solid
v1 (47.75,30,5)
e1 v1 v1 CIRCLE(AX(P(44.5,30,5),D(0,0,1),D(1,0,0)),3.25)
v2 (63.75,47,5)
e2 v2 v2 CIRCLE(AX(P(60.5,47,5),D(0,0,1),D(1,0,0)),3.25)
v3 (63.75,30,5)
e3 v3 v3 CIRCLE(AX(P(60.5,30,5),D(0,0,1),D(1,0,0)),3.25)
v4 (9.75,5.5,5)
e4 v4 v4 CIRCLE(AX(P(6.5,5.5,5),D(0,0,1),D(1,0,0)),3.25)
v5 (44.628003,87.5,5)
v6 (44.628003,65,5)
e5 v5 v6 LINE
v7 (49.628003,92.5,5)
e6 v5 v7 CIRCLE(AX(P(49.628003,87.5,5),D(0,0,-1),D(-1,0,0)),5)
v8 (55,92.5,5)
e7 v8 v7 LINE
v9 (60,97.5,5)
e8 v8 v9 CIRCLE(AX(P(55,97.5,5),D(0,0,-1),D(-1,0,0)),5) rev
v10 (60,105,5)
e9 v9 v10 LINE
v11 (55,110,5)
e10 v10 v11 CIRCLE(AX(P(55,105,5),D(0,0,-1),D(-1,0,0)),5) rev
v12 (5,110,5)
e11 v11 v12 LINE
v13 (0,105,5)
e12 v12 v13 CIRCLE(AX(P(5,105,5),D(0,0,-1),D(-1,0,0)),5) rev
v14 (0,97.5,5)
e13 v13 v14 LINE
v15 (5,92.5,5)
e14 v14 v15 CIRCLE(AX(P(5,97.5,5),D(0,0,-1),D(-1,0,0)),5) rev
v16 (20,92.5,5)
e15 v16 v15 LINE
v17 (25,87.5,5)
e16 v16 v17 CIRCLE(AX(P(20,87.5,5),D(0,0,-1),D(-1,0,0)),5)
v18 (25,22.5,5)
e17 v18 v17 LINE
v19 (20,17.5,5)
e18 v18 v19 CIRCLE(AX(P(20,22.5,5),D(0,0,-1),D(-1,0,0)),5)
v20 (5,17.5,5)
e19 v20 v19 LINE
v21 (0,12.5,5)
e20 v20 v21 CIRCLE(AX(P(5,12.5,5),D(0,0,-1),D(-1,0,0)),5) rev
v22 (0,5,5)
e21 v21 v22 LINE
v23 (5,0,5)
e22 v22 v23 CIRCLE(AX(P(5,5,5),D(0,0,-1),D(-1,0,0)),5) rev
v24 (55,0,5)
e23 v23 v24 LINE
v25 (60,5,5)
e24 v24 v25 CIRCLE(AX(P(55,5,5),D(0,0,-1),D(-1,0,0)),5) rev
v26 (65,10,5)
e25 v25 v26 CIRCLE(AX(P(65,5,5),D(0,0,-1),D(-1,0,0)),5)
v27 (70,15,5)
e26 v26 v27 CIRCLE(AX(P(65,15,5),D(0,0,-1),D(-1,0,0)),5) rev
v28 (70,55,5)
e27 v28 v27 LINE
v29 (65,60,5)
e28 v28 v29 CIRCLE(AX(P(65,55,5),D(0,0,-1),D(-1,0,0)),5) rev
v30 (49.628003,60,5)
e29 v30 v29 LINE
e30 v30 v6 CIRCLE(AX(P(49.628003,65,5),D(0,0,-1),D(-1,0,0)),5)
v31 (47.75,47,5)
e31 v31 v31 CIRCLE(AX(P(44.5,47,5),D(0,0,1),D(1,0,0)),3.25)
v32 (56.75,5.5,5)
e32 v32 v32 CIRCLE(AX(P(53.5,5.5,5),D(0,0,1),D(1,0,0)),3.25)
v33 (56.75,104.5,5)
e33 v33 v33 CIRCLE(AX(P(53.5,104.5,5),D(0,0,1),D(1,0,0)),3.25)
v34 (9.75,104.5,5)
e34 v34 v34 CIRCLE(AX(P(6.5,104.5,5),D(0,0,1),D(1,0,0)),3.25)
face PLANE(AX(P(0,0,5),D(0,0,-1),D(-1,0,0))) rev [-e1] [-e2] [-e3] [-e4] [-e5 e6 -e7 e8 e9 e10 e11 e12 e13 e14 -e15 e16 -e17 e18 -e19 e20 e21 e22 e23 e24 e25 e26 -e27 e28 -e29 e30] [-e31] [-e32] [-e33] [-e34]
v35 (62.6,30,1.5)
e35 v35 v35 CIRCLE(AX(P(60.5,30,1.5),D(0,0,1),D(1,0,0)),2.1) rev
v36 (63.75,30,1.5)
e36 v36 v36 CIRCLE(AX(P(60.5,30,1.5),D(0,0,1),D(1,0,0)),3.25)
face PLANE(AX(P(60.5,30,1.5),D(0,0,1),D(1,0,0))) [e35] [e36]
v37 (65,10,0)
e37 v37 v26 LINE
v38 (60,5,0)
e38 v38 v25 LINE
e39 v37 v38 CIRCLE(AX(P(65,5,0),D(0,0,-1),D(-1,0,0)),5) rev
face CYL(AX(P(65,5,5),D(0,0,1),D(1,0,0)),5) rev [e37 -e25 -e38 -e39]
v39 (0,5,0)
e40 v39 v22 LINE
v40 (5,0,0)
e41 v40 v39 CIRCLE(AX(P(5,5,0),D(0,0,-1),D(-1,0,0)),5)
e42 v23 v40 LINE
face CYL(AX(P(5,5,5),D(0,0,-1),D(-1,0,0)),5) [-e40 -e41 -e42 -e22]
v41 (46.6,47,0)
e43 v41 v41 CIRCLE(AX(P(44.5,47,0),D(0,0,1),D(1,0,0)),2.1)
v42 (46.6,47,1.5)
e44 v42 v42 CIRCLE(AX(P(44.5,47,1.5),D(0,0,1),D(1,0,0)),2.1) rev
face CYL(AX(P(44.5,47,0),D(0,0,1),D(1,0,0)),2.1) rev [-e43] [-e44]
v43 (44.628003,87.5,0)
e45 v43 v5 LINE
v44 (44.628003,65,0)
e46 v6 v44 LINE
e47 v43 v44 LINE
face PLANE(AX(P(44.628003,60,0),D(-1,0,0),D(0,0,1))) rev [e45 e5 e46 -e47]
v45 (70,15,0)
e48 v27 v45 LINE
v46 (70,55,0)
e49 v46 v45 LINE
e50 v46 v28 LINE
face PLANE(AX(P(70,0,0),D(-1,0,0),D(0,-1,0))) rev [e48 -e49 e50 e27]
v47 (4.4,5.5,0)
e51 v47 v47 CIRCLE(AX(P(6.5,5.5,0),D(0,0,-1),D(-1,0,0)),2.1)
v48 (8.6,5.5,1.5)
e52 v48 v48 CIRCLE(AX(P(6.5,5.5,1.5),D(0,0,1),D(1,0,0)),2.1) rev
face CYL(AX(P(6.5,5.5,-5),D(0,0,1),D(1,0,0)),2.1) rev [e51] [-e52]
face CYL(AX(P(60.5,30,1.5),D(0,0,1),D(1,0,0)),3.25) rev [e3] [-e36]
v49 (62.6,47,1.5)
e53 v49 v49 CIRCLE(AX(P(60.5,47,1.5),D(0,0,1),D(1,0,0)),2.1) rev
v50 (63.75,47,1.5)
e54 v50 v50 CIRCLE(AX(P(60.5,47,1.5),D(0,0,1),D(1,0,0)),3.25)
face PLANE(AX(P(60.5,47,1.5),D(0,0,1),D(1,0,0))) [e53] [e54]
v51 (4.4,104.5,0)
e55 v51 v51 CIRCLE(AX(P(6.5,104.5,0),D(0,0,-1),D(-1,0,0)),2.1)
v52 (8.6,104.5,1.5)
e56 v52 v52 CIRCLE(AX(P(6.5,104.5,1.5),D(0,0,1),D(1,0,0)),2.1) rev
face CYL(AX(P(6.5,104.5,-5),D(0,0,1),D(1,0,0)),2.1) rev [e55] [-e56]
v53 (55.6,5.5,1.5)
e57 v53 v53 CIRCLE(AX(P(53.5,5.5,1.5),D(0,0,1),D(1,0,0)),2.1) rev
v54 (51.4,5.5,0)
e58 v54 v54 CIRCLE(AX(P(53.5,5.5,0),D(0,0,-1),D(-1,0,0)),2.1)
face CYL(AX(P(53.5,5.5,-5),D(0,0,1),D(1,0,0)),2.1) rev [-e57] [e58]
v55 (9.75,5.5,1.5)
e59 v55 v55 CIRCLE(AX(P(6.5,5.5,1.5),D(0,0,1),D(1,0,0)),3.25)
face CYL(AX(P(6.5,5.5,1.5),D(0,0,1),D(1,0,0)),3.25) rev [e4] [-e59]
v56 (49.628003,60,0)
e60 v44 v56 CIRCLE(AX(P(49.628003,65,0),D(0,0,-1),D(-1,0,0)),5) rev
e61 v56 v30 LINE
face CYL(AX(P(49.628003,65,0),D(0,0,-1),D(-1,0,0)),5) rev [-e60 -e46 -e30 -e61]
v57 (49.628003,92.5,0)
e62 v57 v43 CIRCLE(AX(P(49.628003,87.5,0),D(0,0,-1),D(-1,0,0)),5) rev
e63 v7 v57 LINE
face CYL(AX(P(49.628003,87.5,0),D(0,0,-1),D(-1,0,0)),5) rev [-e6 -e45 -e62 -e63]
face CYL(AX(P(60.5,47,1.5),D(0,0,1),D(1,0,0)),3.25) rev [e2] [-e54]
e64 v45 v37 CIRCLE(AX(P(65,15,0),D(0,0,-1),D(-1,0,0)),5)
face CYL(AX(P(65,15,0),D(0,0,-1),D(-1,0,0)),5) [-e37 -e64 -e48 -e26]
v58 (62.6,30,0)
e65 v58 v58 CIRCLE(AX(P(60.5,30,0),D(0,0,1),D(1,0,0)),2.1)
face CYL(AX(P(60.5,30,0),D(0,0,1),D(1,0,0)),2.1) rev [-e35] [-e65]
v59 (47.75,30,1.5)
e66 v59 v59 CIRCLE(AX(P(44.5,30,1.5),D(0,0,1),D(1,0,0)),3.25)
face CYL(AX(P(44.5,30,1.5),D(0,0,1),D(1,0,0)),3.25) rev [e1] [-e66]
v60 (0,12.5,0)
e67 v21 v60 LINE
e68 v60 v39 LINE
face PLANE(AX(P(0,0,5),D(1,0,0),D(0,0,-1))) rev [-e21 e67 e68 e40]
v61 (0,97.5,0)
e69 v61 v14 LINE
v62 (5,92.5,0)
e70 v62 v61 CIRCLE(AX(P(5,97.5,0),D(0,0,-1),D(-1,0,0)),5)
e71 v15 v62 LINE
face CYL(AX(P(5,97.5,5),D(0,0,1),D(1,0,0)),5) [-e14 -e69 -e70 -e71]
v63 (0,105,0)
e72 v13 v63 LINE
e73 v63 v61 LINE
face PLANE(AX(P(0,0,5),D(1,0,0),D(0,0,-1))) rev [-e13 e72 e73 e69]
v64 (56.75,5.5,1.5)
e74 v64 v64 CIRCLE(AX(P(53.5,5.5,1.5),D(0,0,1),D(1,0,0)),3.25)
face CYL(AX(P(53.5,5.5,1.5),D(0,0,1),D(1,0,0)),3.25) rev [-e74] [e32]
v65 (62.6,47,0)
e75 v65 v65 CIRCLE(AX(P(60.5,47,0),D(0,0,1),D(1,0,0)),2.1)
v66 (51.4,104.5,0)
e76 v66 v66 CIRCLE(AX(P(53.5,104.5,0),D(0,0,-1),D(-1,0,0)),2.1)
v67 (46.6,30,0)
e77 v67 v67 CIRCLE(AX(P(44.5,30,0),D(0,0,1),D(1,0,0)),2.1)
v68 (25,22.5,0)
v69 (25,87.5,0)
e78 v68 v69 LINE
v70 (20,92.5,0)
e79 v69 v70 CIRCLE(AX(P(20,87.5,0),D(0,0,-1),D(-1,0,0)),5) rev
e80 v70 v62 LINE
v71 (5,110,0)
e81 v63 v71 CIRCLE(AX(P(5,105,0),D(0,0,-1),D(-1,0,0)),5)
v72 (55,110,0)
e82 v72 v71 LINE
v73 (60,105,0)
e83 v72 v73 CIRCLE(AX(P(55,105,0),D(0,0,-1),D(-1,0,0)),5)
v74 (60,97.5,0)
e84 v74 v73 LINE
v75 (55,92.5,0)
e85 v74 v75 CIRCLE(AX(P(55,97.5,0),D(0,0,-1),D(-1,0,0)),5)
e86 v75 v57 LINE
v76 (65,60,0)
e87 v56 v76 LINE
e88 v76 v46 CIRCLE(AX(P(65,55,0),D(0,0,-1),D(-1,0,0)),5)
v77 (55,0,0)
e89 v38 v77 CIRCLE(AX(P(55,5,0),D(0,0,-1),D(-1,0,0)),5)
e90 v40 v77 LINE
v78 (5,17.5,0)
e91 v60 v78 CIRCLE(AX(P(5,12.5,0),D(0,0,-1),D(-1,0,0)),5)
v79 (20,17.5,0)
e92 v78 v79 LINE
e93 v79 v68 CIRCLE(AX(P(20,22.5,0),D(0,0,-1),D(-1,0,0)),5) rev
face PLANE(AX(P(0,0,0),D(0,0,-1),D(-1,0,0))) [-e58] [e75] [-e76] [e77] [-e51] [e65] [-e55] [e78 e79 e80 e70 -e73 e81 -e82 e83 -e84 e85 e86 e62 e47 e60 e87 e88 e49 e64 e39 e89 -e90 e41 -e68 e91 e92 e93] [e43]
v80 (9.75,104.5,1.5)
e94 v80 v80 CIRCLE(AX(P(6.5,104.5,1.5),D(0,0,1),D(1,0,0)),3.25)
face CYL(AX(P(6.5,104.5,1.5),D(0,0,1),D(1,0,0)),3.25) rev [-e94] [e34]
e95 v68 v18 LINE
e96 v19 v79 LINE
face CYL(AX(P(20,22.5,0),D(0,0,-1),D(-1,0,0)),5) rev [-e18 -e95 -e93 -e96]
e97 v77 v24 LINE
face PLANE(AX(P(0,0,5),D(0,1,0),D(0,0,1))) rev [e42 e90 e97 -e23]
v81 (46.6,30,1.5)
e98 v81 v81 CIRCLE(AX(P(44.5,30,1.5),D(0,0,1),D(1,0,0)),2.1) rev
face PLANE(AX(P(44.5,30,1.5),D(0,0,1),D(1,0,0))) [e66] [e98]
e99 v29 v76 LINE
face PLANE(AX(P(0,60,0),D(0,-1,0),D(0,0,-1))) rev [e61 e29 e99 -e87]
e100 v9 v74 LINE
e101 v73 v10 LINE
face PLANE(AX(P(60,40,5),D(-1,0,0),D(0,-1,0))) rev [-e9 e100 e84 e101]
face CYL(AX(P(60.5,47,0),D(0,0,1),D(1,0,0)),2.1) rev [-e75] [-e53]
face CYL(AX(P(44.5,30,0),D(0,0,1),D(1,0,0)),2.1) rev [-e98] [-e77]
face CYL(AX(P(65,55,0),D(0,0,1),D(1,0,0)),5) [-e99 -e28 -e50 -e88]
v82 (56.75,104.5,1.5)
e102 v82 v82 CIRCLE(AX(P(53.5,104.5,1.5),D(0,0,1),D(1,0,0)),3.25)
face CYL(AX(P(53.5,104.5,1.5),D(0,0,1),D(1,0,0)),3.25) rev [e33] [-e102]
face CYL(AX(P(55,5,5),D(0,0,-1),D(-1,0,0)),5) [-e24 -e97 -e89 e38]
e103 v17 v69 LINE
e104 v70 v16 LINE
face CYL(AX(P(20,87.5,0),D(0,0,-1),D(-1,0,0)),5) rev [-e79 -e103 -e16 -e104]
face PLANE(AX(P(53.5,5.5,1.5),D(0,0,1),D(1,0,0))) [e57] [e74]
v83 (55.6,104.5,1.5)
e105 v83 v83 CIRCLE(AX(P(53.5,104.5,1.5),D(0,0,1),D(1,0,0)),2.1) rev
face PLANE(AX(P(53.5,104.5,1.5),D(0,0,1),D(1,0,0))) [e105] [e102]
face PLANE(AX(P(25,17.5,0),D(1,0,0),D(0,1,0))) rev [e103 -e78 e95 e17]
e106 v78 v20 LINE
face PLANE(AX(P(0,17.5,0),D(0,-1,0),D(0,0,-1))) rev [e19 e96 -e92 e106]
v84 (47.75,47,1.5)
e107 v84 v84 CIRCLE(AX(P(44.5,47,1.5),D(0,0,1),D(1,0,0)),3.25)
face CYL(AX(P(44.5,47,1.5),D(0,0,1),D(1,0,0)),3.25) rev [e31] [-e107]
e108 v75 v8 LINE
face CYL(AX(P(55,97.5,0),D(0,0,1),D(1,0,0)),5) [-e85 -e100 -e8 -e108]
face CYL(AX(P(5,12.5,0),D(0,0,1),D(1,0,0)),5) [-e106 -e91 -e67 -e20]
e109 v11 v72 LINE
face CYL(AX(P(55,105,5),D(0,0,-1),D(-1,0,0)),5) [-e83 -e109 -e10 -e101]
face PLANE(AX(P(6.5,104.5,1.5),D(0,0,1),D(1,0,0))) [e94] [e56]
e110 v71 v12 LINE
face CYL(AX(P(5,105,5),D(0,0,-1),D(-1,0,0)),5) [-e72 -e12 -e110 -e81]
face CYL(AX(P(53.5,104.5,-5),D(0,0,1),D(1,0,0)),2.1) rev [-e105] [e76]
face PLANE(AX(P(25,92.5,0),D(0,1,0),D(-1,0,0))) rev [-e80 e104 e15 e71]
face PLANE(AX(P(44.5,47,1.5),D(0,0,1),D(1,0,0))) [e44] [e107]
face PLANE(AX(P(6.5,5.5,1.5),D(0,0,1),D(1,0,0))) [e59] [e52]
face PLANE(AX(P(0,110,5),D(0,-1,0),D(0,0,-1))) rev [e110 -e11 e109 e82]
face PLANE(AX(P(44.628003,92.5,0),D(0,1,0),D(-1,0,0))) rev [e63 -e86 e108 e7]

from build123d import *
from build123d.topology import SkipClean

# Parameters (mm, degrees)
BOSS_EXTRUDE1_DEPTH = 5
SKETCH3_R           = 2.1
CUT_EXTRUDE1_DEPTH  = 10
BOSS_EXTRUDE2_DEPTH = 5
SKETCH4_3_R         = 2.1
CUT_EXTRUDE2_DEPTH  = 5
FILLET1_R           = 5
SKETCH5_W           = 25
SKETCH5_H           = 75
SKETCH5_W_2         = 15.371996706
SKETCH5_H_2         = 32.5
CUT_EXTRUDE3_DEPTH  = 5
FILLET2_R           = 5
SKETCH6_R           = 3.25
CUT_EXTRUDE4_DEPTH  = 3.5


with BuildPart() as part:
    # Sketch1 → Boss-Extrude1 (new body)
    with BuildSketch(Plane.XY):
        Polygon((60, 40), (60, 110), (0, 110), (0, 0), (60, 0), align=None)
    extrude(amount=BOSS_EXTRUDE1_DEPTH)

    # Sketch3 → Cut-Extrude1 (cut)
    with BuildSketch(Plane.XY.offset(5)):
        with Locations((6.5, 5.5)):
            Circle(SKETCH3_R)
        with Locations((53.5, 5.5)):
            Circle(SKETCH3_R)
        with Locations(Location((53.5, 104.5, 0), (0, 0, 180))):
            Circle(SKETCH3_R)
        with Locations(Location((6.5, 104.5, 0), (0, 0, 180))):
            Circle(SKETCH3_R)
    extrude(amount=-CUT_EXTRUDE1_DEPTH, mode=Mode.SUBTRACT)

    # Sketch4 → Boss-Extrude2 (add)
    with BuildSketch(Plane.XY.offset(5)):
        with BuildLine():
            Line((70, 60), (60, 60))
            Line((60, 60), (60, 49.039607805))
            ThreePointArc((60, 49.039607805), (61.79614814, 48.652271164), (62.6, 47))
            ThreePointArc((62.6, 47), (61.79614814, 45.347728836), (60, 44.960392195))
            Line((60, 44.960392195), (60, 32.039607805))
            ThreePointArc((60, 32.039607805), (61.79614814, 31.652271164), (62.6, 30))
            ThreePointArc((62.6, 30), (61.79614814, 28.347728836), (60, 27.960392195))
            Line((60, 27.960392195), (60, 10))
            Line((60, 10), (70, 10))
            Line((70, 10), (70, 60))
        make_face()
    extrude(amount=-BOSS_EXTRUDE2_DEPTH)

    # Sketch4<3> → Cut-Extrude2 (cut)
    with SkipClean():  # the faces are left unmerged after this step: merging them gives an invalid solid
        with BuildSketch(Plane.XY.offset(5)):
            with Locations((60.5, 30)):
                Circle(SKETCH4_3_R)
            with Locations((44.5, 30)):
                Circle(SKETCH4_3_R)
            with Locations((44.5, 47)):
                Circle(SKETCH4_3_R)
            with Locations((60.5, 47)):
                Circle(SKETCH4_3_R)
        extrude(amount=-CUT_EXTRUDE2_DEPTH, mode=Mode.SUBTRACT)

    # Fillet1
    fillet1_edges = [part.edges().sort_by_distance(p)[0] for p in [
        (0, 110, 2.5),
        (0, 0, 2.5),
    ]]
    fillet(fillet1_edges, radius=FILLET1_R)

    # Sketch5 → Cut-Extrude3 (cut)
    with BuildSketch(Plane.XY.offset(5)):
        with Locations((12.5, 55)):
            Rectangle(SKETCH5_W, SKETCH5_H)
        with Locations((52.314001647, 76.25)):
            Rectangle(SKETCH5_W_2, SKETCH5_H_2)
    extrude(amount=-CUT_EXTRUDE3_DEPTH, mode=Mode.SUBTRACT)

    # Fillet2
    fillet2_edges = [part.edges().sort_by_distance(p)[0] for p in [
        (60, 0, 2.5),
        (60, 10, 2.5),
        (70, 10, 2.5),
        (70, 60, 2.5),
        (60, 92.5, 2.5),
        (60, 110, 2.5),
        (44.628003294, 92.5, 2.5),
        (44.628003294, 60, 2.5),
        (0, 17.5, 2.5),
        (25, 17.5, 2.5),
        (25, 92.5, 2.5),
        (0, 92.5, 2.5),
    ]]
    fillet(fillet2_edges, radius=FILLET2_R - 0.0001)  # a hair under: the kernel refuses the full size

    # Sketch6 → Cut-Extrude4 (cut)
    with BuildSketch(Plane.XY.offset(5)):
        with Locations((44.5, 47)):
            Circle(SKETCH6_R)
        with Locations((60.5, 47)):
            Circle(SKETCH6_R)
        with Locations((60.5, 30)):
            Circle(SKETCH6_R)
        with Locations((44.5, 30)):
            Circle(SKETCH6_R)
        with Locations((53.5, 5.5)):
            Circle(SKETCH6_R)
        with Locations((6.5, 5.5)):
            Circle(SKETCH6_R)
        with Locations((6.5, 104.5)):
            Circle(SKETCH6_R)
        with Locations((53.5, 104.5)):
            Circle(SKETCH6_R)
    extrude(amount=-CUT_EXTRUDE4_DEPTH, mode=Mode.SUBTRACT)


solid = part.part
